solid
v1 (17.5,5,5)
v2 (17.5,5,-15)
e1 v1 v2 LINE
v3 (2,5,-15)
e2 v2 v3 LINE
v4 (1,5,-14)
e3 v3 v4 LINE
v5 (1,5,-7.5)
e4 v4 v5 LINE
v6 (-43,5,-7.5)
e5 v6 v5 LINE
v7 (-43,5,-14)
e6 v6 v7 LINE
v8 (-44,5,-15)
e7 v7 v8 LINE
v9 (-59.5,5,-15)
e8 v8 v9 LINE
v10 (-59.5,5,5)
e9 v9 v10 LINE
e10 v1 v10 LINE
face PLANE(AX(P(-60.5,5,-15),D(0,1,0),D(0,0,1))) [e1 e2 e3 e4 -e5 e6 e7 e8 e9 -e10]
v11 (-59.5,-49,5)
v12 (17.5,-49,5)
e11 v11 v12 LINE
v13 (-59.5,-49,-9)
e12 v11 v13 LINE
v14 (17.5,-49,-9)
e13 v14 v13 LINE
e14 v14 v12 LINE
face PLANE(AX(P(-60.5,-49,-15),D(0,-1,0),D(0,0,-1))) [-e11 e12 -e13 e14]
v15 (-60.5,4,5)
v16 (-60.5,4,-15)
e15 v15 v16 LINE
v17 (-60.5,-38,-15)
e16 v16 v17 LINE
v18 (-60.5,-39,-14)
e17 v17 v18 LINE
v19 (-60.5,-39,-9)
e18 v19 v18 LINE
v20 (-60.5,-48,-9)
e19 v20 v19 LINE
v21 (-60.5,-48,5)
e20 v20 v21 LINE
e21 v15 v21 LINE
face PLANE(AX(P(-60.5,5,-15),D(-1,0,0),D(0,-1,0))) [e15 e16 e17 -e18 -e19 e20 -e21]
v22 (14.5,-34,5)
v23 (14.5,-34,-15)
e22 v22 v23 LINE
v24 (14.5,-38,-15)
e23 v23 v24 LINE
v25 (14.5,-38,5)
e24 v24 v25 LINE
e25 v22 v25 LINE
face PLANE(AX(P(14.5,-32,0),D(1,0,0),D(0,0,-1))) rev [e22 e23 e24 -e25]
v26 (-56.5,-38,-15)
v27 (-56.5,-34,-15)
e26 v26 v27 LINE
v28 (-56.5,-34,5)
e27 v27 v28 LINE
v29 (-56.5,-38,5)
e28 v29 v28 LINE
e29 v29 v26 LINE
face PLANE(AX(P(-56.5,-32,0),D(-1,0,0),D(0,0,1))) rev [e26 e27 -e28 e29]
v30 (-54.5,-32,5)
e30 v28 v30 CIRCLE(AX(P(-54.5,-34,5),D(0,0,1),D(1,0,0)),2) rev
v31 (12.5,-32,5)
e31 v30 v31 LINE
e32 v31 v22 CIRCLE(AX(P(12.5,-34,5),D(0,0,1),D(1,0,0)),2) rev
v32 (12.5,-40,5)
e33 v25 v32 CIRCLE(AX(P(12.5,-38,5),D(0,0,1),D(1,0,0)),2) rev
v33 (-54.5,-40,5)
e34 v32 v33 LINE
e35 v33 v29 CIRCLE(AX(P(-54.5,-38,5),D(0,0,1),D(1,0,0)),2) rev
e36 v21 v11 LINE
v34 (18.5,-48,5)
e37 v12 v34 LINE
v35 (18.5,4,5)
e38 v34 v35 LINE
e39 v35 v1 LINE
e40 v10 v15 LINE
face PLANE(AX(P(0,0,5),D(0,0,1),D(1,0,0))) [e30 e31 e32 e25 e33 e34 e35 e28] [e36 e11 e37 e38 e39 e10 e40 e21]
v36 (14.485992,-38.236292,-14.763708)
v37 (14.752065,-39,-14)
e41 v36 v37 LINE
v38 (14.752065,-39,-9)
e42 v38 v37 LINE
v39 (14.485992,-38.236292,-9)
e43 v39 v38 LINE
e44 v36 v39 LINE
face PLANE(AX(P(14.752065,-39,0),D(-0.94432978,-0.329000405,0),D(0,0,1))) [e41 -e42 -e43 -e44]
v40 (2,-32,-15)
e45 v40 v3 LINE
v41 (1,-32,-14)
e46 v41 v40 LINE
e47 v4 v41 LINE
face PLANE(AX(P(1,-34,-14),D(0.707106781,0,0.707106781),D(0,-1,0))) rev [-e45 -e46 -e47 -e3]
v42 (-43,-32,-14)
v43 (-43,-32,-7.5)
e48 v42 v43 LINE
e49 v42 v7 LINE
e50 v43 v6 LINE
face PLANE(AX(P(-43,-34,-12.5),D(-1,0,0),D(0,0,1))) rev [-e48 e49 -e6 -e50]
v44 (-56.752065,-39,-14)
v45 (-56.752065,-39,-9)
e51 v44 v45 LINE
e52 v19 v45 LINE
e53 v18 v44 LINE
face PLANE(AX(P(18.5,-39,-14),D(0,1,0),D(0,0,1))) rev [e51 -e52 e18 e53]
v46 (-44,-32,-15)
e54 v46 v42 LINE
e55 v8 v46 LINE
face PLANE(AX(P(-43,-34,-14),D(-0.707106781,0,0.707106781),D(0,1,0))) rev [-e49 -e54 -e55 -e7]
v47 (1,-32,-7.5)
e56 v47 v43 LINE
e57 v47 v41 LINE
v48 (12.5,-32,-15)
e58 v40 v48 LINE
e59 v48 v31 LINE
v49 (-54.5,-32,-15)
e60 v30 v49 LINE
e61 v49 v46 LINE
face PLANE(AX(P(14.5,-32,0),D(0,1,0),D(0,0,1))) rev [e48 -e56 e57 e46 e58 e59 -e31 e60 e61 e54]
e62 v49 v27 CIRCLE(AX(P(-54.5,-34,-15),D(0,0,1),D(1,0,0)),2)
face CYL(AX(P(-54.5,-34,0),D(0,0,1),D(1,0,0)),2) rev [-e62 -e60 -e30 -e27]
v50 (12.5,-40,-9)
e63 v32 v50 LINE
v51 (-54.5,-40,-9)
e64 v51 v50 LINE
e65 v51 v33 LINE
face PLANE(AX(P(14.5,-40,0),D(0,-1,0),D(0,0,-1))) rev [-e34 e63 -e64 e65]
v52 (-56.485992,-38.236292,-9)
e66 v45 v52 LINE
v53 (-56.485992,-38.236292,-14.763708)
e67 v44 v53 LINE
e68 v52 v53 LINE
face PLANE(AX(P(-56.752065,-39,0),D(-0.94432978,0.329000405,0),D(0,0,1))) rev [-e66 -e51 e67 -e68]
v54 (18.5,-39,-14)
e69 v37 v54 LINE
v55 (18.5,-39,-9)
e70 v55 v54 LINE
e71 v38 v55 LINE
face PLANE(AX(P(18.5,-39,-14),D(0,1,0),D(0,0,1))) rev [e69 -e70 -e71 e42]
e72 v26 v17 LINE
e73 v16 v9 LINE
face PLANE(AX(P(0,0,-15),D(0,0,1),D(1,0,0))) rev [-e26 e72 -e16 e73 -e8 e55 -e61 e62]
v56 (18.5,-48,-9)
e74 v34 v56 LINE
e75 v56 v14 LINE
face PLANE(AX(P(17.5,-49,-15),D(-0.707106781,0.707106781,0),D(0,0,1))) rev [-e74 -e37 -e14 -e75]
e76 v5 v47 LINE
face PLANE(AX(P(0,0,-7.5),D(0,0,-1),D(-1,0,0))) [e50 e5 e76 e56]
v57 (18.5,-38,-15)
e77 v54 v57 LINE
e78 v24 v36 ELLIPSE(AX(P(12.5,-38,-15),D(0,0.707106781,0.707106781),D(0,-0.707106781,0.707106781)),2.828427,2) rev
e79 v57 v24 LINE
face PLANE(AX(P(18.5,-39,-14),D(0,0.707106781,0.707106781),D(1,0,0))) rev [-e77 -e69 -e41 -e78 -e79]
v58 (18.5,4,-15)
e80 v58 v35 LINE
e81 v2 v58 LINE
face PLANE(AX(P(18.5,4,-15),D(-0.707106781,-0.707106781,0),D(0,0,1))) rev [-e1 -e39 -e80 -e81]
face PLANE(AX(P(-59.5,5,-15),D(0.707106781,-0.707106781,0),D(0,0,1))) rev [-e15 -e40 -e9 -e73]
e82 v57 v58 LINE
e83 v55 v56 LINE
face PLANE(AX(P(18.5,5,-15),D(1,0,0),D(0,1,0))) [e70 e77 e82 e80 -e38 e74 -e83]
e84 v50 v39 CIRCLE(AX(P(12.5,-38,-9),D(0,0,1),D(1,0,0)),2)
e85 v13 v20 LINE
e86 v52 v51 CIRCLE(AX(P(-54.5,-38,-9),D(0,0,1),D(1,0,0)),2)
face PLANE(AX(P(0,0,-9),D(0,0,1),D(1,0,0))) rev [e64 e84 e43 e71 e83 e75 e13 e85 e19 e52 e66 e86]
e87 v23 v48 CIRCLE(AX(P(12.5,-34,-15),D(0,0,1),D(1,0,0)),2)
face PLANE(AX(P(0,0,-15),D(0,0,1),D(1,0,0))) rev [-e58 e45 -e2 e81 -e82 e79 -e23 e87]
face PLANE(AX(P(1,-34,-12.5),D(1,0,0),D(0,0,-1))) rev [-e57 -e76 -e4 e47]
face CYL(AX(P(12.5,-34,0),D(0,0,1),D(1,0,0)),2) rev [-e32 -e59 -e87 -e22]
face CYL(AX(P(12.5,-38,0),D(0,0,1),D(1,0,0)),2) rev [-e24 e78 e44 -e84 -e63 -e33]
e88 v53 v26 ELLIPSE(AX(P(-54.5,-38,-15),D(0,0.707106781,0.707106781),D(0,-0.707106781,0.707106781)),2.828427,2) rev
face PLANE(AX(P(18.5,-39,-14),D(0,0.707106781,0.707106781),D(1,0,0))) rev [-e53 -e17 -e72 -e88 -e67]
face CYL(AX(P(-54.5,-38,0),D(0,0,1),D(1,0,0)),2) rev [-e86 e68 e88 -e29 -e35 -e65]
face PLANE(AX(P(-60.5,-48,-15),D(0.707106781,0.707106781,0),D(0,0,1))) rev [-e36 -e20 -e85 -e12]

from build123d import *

# Parameters (mm, degrees)
BOSS_EXTRUDE1_DEPTH      = 5
BOSS_EXTRUDE1_DEPTH_BACK = 15
SKETCH1_W                = 79
SKETCH1_H                = 54
SKETCH3_W                = 79
SKETCH3_H                = 10
CUT_EXTRUDE1_DEPTH       = 1
SKETCH4_W                = 71
SKETCH4_H                = 8
CUT_EXTRUDE2_DEPTH       = 15
SKETCH5_W                = 44
SKETCH5_H                = 35
CUT_EXTRUDE3_DEPTH       = 2.5
SKETCH6_W                = 44
SKETCH6_H                = 2.5
CUT_EXTRUDE4_DEPTH       = 80.907759323
SKETCH7_W                = 71
SKETCH7_H                = 8
CUT_EXTRUDE5_DEPTH       = 80.285875161
SKETCH8_W                = 44
SKETCH8_H                = 37
CUT_EXTRUDE6_DEPTH       = 5
CUT_EXTRUDE7_DEPTH       = 5
FILLET1_R                = 2
CHAMFER2_SIZE            = 1
CHAMFER3_SIZE            = 1
CHAMFER4_SIZE            = 1


with BuildPart() as part:
    # Sketch1 → Boss-Extrude1 (new, two sides: drawn at the far end of the back side and taken through both)
    with BuildSketch(Plane.XY.offset(-BOSS_EXTRUDE1_DEPTH_BACK)):
        with Locations((-21, -22)):
            Rectangle(SKETCH1_W, SKETCH1_H)
    extrude(amount=BOSS_EXTRUDE1_DEPTH + BOSS_EXTRUDE1_DEPTH_BACK)

    # Sketch3 → Cut-Extrude1 (cut)
    with BuildSketch(Plane(origin=(0, 0, -15), x_dir=(-1, 0, 0), z_dir=(0, 0, -1))):
        with Locations((21, -44)):
            Rectangle(SKETCH3_W, SKETCH3_H)
    extrude(amount=-CUT_EXTRUDE1_DEPTH, mode=Mode.SUBTRACT)

    # Sketch4 → Cut-Extrude2 (cut)
    with BuildSketch(Plane(origin=(0, 0, -15), x_dir=(-1, 0, 0), z_dir=(0, 0, -1))):
        with Locations((21, -36)):
            Rectangle(SKETCH4_W, SKETCH4_H)
    extrude(amount=-CUT_EXTRUDE2_DEPTH, mode=Mode.SUBTRACT)

    # Sketch5 → Cut-Extrude3 (cut)
    with BuildSketch(Plane(origin=(0, 0, -15), x_dir=(-1, 0, 0), z_dir=(0, 0, -1))):
        with Locations((21, -16.5)):
            Rectangle(SKETCH5_W, SKETCH5_H)
    extrude(amount=-CUT_EXTRUDE3_DEPTH, mode=Mode.SUBTRACT)

    # Sketch6 → Cut-Extrude4 (cut, through all)
    with BuildSketch(Plane.XZ.offset(-1)):
        with Locations((-21, -13.75)):
            Rectangle(SKETCH6_W, SKETCH6_H)
    extrude(amount=-CUT_EXTRUDE4_DEPTH, mode=Mode.SUBTRACT)

    # Sketch7 → Cut-Extrude5 (cut, through all)
    with BuildSketch(Plane(origin=(0, 0, 0), x_dir=(-1, 0, 0), z_dir=(0, 0, -1))):
        with Locations((21, -36)):
            Rectangle(SKETCH7_W, SKETCH7_H)
    extrude(amount=-CUT_EXTRUDE5_DEPTH, mode=Mode.SUBTRACT)

    # Sketch8 → Cut-Extrude6 (cut)
    with BuildSketch(Plane(origin=(0, 0, -12.5), x_dir=(-1, 0, 0), z_dir=(0, 0, -1))):
        with Locations((21, -13.5)):
            Rectangle(SKETCH8_W, SKETCH8_H)
    extrude(amount=-CUT_EXTRUDE6_DEPTH, mode=Mode.SUBTRACT)

    # Sketch9 → Cut-Extrude7 (cut)
    with BuildSketch(Plane(origin=(0, 0, -14), x_dir=(-1, 0, 0), z_dir=(0, 0, -1))):
        Polygon((56.5, -40), (-14.5, -40), (-14.5, -39), (-18.5, -39), (-18.5, -49), (60.5, -49), (60.5, -39), (56.5, -39), align=None)
    extrude(amount=-CUT_EXTRUDE7_DEPTH, mode=Mode.SUBTRACT)

    # Fillet1
    fillet1_edges = [part.edges().sort_by_distance(p)[0] for p in [
        (14.5, -40, -2),
        (14.5, -32, -5),
        (-56.5, -32, -5),
        (-56.5, -40, -2),
    ]]
    fillet(fillet1_edges, radius=FILLET1_R)

    # Chamfer1
    # the kernel refuses this chamfer: 1, 0.732050808 mm, written as the material it takes off along each edge
    with BuildSketch(Plane(origin=(14.232050808, -39, -9), x_dir=(0.9974998388550008, -0.07066874474792476, 0), z_dir=(0, 0, -1))) as chamfer1_piece_1:
        with BuildLine():
            Line((0.534510572, 0), (0.183539981, -0.816493036))
            Line((0.183539981, -0.816493036), (0.163562724, -0.817446573))
            ThreePointArc((0.163562724, -0.817446573), (0.12384643, -0.40032394), (-0.017983891, -0.00875098))
            Line((-0.017983891, -0.00875098), (0.001413375, 0.019949997))
            ThreePointArc((0.001413375, 0.019949997), (0.267333969, 0.001110621), (0.535923947, 0.019949997))
            Line((0.535923947, 0.019949997), (0.534510572, 0))
        make_face()
    extrude(amount=8.092169631, mode=Mode.SUBTRACT)
    with BuildSketch(Plane(origin=(-56.232050808, -39, -17.092169631), x_dir=(-0.2877176347633081, 0.9577152826629675, 0), z_dir=(0, 0, 1))) as chamfer1_piece_2:
        with BuildLine():
            Line((0.836867853, 0), (0.11722766, 0.521497102))
            Line((0.11722766, 0.521497102), (0.098073354, 0.527251455))
            ThreePointArc((0.098073354, 0.527251455), (0.057547506, 0.261068897), (-0.019154306, 0.005754353))
            Line((-0.019154306, 0.005754353), (0.004593737, -0.019465292))
            ThreePointArc((0.004593737, -0.019465292), (0.417739168, 0.033033052), (0.833416807, -0.019700007))
            Line((0.833416807, -0.019700007), (0.836867853, 0))
        make_face()
    extrude(amount=8.092169631, mode=Mode.SUBTRACT)

    # Chamfer2
    chamfer2_edges = [part.edges().sort_by_distance(p)[0] for p in [
        (1, -13.5, -15),
        (-43, -13.5, -15),
    ]]
    chamfer(chamfer2_edges, length=CHAMFER2_SIZE)

    # Chamfer3
    chamfer3_edges = [part.edges().sort_by_distance(p)[0] for p in [
        (18.5, -49, -2),
        (-60.5, -49, -2),
        (-60.5, 5, -5),
        (18.5, 5, -5),
    ]]
    chamfer(chamfer3_edges, length=CHAMFER3_SIZE)

    # Chamfer4
    chamfer4_edges = [part.edges().sort_by_distance(p)[0] for p in [
        (-58.626032501, -39, -15),
        (16.626032501, -39, -15),
    ]]
    chamfer(chamfer4_edges, length=CHAMFER4_SIZE)


solid = part.part
